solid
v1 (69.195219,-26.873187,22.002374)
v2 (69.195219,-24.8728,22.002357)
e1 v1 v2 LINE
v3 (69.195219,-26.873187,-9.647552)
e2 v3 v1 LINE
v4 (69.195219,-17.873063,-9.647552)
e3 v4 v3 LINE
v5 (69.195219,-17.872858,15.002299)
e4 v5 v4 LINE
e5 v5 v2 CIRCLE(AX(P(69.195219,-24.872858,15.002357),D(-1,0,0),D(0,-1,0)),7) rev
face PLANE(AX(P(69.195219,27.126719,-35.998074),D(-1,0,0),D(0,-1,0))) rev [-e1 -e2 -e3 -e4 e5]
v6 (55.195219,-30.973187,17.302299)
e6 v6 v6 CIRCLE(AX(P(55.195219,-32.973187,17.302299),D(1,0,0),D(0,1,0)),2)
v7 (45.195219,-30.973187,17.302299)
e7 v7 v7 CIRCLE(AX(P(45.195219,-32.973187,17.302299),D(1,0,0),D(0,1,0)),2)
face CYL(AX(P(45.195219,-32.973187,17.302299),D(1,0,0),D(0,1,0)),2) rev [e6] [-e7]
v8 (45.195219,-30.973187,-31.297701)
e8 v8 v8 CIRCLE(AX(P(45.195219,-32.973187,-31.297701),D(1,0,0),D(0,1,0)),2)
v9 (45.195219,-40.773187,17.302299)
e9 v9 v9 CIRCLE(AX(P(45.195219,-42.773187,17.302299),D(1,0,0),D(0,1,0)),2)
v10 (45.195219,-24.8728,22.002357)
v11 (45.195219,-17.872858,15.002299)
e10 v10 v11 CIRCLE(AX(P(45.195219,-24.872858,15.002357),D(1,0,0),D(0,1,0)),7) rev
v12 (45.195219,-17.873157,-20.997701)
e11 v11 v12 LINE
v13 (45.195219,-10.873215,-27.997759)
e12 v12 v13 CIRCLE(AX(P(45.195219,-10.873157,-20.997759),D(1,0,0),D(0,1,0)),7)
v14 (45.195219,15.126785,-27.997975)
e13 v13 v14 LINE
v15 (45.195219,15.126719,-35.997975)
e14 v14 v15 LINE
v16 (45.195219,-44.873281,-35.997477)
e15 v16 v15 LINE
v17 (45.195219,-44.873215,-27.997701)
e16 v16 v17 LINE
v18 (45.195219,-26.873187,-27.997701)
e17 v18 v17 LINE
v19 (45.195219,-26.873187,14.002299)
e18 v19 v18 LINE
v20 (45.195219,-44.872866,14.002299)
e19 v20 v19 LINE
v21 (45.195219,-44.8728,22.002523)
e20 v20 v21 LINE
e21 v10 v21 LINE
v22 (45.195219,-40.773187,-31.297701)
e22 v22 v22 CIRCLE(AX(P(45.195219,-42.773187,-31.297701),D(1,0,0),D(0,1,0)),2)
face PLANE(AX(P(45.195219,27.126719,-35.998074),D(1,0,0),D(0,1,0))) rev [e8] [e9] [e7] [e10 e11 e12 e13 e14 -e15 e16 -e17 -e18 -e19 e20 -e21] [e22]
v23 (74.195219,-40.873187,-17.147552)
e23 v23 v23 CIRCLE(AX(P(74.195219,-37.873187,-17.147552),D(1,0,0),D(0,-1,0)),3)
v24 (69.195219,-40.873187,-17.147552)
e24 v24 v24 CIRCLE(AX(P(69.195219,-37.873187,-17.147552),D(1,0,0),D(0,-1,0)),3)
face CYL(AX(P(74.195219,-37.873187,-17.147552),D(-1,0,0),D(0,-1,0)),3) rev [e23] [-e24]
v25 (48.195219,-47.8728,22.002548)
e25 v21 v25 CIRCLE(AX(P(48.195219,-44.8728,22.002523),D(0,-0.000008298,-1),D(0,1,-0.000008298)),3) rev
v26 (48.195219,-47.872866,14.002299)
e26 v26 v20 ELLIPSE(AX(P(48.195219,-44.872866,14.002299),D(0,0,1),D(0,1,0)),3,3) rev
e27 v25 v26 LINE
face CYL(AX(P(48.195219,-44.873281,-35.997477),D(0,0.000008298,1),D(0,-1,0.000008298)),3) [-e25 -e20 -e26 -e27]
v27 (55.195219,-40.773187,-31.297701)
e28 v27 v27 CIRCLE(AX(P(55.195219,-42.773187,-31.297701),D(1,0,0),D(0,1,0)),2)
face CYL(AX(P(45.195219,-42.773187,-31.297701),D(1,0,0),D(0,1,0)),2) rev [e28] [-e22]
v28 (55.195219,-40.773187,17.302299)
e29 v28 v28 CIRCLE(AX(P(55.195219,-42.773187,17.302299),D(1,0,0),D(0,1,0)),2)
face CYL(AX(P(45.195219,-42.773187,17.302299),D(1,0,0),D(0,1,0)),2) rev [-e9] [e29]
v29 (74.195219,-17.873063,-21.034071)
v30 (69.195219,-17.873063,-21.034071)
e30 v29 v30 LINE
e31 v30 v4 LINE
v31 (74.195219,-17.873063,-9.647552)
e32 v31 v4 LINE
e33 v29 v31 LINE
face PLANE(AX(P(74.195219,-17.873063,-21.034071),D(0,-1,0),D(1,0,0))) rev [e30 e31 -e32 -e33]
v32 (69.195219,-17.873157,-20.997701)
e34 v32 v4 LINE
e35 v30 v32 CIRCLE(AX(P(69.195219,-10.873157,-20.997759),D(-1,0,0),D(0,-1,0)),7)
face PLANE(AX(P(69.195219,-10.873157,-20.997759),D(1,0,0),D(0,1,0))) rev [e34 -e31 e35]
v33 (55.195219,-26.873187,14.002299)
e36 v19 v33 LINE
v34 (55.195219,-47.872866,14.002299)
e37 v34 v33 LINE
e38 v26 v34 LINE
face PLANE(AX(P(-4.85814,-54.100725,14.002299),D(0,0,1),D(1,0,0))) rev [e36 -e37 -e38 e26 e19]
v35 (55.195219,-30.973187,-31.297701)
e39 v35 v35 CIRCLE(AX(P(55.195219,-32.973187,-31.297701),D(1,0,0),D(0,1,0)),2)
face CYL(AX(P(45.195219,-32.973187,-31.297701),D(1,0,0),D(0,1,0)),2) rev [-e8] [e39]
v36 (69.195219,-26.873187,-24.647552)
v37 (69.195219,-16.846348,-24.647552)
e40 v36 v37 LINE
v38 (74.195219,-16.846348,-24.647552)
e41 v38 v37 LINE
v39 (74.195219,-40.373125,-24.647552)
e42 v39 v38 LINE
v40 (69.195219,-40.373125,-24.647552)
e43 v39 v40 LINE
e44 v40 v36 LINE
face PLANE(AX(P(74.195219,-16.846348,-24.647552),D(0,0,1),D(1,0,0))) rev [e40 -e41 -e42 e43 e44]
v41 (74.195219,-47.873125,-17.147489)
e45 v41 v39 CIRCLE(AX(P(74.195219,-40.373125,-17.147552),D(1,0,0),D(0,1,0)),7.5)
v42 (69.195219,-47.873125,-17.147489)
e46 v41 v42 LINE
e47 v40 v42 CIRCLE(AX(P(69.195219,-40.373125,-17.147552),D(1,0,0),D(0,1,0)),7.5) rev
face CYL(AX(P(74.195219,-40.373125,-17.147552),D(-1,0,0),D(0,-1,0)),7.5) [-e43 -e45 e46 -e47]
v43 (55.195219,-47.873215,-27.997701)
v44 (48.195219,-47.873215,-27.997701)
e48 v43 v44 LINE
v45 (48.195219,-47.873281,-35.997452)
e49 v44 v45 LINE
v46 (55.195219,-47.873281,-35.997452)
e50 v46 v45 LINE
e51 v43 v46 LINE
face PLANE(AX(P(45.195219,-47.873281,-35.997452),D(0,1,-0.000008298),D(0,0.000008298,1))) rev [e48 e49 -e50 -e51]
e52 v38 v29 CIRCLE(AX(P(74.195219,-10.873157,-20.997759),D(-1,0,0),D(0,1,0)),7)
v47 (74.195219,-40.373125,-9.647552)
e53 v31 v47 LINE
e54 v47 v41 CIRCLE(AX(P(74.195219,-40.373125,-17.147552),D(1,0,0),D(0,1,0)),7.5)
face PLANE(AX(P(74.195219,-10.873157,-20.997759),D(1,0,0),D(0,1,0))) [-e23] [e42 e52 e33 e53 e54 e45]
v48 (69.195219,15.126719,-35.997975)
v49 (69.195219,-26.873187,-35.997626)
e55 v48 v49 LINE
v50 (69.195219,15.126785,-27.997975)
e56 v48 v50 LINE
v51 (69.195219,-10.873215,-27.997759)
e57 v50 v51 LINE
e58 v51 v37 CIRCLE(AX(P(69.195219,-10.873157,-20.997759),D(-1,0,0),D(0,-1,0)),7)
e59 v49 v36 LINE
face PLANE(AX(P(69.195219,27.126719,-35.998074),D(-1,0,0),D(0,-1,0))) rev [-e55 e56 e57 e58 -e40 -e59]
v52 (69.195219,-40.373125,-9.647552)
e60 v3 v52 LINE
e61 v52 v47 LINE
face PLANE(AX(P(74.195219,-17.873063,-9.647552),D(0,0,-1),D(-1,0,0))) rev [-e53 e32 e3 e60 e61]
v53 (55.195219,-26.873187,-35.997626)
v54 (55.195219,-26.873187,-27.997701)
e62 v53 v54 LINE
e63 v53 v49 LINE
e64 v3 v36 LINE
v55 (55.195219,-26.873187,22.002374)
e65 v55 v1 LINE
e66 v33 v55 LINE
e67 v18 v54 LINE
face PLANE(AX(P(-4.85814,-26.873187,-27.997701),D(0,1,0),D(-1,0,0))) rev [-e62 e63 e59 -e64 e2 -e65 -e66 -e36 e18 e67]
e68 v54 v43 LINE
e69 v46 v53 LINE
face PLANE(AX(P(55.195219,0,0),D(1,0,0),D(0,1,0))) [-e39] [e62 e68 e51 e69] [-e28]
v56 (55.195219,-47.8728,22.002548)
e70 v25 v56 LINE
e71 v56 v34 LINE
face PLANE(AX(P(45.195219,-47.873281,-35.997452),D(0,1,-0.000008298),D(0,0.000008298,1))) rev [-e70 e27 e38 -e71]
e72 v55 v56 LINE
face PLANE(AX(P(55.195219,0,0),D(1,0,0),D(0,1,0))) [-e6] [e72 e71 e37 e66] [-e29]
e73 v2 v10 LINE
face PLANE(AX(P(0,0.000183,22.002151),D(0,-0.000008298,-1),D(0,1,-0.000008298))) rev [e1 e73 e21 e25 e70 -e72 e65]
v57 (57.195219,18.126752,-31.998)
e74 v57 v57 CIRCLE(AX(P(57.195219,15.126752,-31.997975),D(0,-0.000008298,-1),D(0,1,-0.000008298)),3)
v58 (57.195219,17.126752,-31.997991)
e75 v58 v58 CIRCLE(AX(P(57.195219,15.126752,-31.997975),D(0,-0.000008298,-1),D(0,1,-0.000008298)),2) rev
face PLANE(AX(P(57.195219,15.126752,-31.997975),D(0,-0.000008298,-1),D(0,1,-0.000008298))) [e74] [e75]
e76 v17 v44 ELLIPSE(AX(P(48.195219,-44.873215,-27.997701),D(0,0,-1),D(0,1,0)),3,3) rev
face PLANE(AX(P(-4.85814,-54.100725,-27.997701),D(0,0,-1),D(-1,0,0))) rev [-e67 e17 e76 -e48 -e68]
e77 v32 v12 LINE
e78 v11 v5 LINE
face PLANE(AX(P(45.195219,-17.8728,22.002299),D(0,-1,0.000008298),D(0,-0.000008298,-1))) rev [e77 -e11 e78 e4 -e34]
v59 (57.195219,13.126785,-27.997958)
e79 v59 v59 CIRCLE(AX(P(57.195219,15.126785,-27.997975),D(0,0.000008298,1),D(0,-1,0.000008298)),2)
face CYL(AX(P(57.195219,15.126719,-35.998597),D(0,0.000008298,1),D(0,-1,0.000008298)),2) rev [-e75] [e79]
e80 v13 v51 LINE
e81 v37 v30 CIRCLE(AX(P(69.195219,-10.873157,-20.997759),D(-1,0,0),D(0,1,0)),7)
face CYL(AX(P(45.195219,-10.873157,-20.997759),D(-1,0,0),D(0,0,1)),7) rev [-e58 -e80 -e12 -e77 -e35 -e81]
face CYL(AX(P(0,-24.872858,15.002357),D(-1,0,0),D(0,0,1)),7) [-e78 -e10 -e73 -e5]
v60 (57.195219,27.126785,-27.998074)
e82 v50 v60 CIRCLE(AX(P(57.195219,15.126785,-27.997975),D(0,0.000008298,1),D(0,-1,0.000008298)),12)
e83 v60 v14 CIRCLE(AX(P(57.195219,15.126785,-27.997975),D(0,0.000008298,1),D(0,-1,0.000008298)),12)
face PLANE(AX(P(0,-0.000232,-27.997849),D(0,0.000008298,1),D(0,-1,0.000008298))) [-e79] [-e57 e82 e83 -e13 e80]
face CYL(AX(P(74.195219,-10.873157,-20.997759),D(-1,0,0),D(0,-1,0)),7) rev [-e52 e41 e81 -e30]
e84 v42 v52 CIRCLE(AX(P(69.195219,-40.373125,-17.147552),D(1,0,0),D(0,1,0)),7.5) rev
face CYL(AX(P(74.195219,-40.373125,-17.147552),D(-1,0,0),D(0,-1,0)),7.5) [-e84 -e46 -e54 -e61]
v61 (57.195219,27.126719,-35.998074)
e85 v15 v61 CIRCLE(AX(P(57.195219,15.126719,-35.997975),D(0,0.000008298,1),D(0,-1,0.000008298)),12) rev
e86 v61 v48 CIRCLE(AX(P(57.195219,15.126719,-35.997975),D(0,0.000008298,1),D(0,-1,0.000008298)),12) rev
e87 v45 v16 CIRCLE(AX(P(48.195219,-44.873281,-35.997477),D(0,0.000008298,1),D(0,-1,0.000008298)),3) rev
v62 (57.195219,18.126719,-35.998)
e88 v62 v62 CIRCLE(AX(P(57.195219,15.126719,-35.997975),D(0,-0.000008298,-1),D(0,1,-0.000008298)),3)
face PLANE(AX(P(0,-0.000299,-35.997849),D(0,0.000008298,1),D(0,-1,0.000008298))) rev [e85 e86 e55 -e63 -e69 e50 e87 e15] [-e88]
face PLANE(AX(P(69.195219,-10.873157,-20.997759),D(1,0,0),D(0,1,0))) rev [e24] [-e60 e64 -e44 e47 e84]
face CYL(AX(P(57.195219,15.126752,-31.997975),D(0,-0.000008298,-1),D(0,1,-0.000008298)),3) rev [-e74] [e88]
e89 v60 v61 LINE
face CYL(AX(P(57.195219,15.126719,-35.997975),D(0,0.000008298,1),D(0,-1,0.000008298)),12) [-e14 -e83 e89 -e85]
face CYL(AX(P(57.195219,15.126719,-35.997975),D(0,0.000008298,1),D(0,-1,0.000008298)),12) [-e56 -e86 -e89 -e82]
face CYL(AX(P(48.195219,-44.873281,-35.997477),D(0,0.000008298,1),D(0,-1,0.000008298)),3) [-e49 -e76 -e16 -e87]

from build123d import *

# Parameters (mm, degrees)
SKETCH2_W           = 24
SKETCH2_H           = 75
BOSS_EXTRUDE1_DEPTH = 8
FILLET1_R           = 12
SKETCH3_W           = 24.000000014
SKETCH3_H           = 30
BOSS_EXTRUDE2_DEPTH = 50
SKETCH4_W           = 42
SKETCH4_H           = 27.227537437
CUT_EXTRUDE1_DEPTH  = 24
FILLET2_R           = 7
CUT_EXTRUDE3_DEPTH  = 14
SKETCH6_R           = 3
BOSS_EXTRUDE3_DEPTH = 5
FILLET3_R           = 3
SKETCH7_R           = 2
CUT_EXTRUDE4_DEPTH  = 102.473144681
SKETCH8_R           = 3
CUT_EXTRUDE5_DEPTH  = 4
SKETCH9_R           = 2
CUT_EXTRUDE6_DEPTH  = 10
FILLET4_R           = 7.5


# Some blends are built 0.0001 mm under size
with BuildPart() as part:
    # Sketch2 → Boss-Extrude1 (new body)
    with BuildSketch(Plane(origin=(0, -0.00023232, -27.997849314), x_dir=(1.0, -2.2299085471311813e-10, 0), z_dir=(-1.0101845712424022e-15, -8.29778911543011e-06, -0.9999999999655734))):
        with Locations((57.195219243, 10.372982491)):
            Rectangle(SKETCH2_W, SKETCH2_H)
    extrude(amount=BOSS_EXTRUDE1_DEPTH)

    # Fillet1
    # the kernel refuses this fillet: 12 mm, written as the material it takes off along each edge
    with BuildSketch(Plane(origin=(45.195219249, 27.127034112, 2.001925591), x_dir=(1.0, -2.229911070638136e-10, 0), z_dir=(-1.0101845712424022e-15, -8.29778911543011e-06, -0.9999999999655734))) as fillet1_piece_1:
        with BuildLine():
            CenterArc((FILLET1_R, FILLET1_R), FILLET1_R, 180, 90)
            Line((0, FILLET1_R), (0, 0))
            Line((0, 0), (FILLET1_R, 0))
        make_face()
    extrude(amount=68, mode=Mode.SUBTRACT)
    with BuildSketch(Plane(origin=(69.195219249, 27.127034106, 2.001925591), x_dir=(-1.0, 2.229905149399539e-10, 0), z_dir=(-1.0101845712424022e-15, -8.29778911543011e-06, -0.9999999999655734))) as fillet1_piece_2:
        with BuildLine():
            CenterArc((FILLET1_R, -FILLET1_R), FILLET1_R, 90, 90)
            Line((0, -FILLET1_R), (0, 0))
            Line((0, 0), (FILLET1_R, 0))
        make_face()
    extrude(amount=68, mode=Mode.SUBTRACT)

    # Sketch3 → Boss-Extrude2 (add)
    with BuildSketch(Plane(origin=(0, -0.00023232, -27.997849314), x_dir=(1, 0, 0), z_dir=(0, 8.297789115425485e-06, 0.9999999999655734))):
        with Locations((57.19521924, -32.872982501)):
            Rectangle(SKETCH3_W, SKETCH3_H)
    extrude(amount=BOSS_EXTRUDE2_DEPTH)

    # Sketch4 → Cut-Extrude1 (cut)
    with BuildSketch(Plane(origin=(69.195219243, -1.5e-08, 0), x_dir=(0, 0, -1), z_dir=(1.0, -2.2299088501705893e-10, 0))):
        with Locations((6.99770101, -40.486956155)):
            Rectangle(SKETCH4_W, SKETCH4_H)
    extrude(amount=-CUT_EXTRUDE1_DEPTH, mode=Mode.SUBTRACT)

    # Fillet2
    fillet2_edges = [part.edges().sort_by_distance(p)[0] for p in [
        (57.19521924, -17.87321482, -27.997701008),
        (57.19521924, -17.872799931, 22.002298991),
    ]]
    fillet(fillet2_edges, radius=FILLET2_R)

    # Sketch5 → Cut-Extrude3 (cut)
    with BuildSketch(Plane(origin=(69.195219243, -1.5e-08, 0), x_dir=(0, 0, -1), z_dir=(1.0, -2.2299088501705893e-10, 0))):
        Polygon((-22.002373674, -26.873187436), (-22.002547924, -47.872799915), (35.997452074, -47.873281192), (35.997626328, -26.873187436), align=None)
    extrude(amount=-CUT_EXTRUDE3_DEPTH, mode=Mode.SUBTRACT)

    # Sketch6 → Boss-Extrude3 (add)
    with BuildSketch(Plane(origin=(69.195219243, -1.5e-08, 0), x_dir=(0, 0, -1), z_dir=(1.0, -2.2299088501705893e-10, 0))):
        with BuildLine():
            Line((21.034070668, -17.873062539), (9.647551643, -17.873062539))
            Line((9.647551643, -17.873062539), (9.647551643, -47.873062539))
            Line((9.647551643, -47.873062539), (24.647551644, -47.873187436))
            Line((24.647551644, -47.873187436), (24.647551644, -16.846348023))
            ThreePointArc((24.647551644, -16.846348023), (22.910970159, -17.606627105), (21.034070668, -17.873062539))
        make_face()
        with Locations(Location((17.147551644, -37.873187436, 0), (0, 0, 270))):
            Circle(SKETCH6_R, mode=Mode.SUBTRACT)
    extrude(amount=BOSS_EXTRUDE3_DEPTH)

    # Fillet3
    fillet3_edges = [part.edges().sort_by_distance(p)[0] for p in [
        (45.195219233, -47.872833122, 18.002423457),
        (45.195219233, -47.873248012, -31.997576542),
    ]]
    fillet(fillet3_edges, radius=FILLET3_R)

    # Sketch7 → Cut-Extrude4 (cut, through all)
    with BuildSketch(Plane(origin=(0, -0.00023232, -27.997849314), x_dir=(1, 0, 0), z_dir=(0, 8.297789115402354e-06, 0.9999999999655734))):
        with Locations(Location((57.195219247, 15.127017497, 0), (0, 0, 270))):
            Circle(SKETCH7_R)
    extrude(amount=-CUT_EXTRUDE4_DEPTH, mode=Mode.SUBTRACT)

    # Sketch8 → Cut-Extrude5 (cut)
    with BuildSketch(Plane(origin=(0, -0.000298703, -35.997849314), x_dir=(-1, 0, 0), z_dir=(0, -8.297789115402354e-06, -0.9999999999655734))):
        with Locations(Location((-57.195219247, 15.127017497, 0), (0, 0, 90))):
            Circle(SKETCH8_R)
    extrude(amount=-CUT_EXTRUDE5_DEPTH, mode=Mode.SUBTRACT)

    # Sketch9 → Cut-Extrude6 (cut)
    with BuildSketch(Plane(origin=(55.195219243, -1.2e-08, 0), x_dir=(0, 0, -1), z_dir=(1.0, -2.2299126401379802e-10, 0))):
        with Locations(Location((31.29770101, -42.773187436, 0), (0, 0, 90))):
            Circle(SKETCH9_R)
        with Locations(Location((31.29770101, -32.973187436, 0), (0, 0, 90))):
            Circle(SKETCH9_R)
        with Locations(Location((-17.30229899, -42.773187436, 0), (0, 0, 90))):
            Circle(SKETCH9_R)
        with Locations(Location((-17.30229899, -32.973187436, 0), (0, 0, 90))):
            Circle(SKETCH9_R)
    extrude(amount=-CUT_EXTRUDE6_DEPTH, mode=Mode.SUBTRACT)

    # Fillet4
    fillet4_edges = [part.edges().sort_by_distance(p)[0] for p in [
        (71.695219233, -47.873187452, -24.647551644),
        (71.695219233, -47.873062555, -9.647551643),
    ]]
    fillet(fillet4_edges, radius=FILLET4_R - 0.0001)  # a hair under: the kernel refuses the full size


solid = part.part
